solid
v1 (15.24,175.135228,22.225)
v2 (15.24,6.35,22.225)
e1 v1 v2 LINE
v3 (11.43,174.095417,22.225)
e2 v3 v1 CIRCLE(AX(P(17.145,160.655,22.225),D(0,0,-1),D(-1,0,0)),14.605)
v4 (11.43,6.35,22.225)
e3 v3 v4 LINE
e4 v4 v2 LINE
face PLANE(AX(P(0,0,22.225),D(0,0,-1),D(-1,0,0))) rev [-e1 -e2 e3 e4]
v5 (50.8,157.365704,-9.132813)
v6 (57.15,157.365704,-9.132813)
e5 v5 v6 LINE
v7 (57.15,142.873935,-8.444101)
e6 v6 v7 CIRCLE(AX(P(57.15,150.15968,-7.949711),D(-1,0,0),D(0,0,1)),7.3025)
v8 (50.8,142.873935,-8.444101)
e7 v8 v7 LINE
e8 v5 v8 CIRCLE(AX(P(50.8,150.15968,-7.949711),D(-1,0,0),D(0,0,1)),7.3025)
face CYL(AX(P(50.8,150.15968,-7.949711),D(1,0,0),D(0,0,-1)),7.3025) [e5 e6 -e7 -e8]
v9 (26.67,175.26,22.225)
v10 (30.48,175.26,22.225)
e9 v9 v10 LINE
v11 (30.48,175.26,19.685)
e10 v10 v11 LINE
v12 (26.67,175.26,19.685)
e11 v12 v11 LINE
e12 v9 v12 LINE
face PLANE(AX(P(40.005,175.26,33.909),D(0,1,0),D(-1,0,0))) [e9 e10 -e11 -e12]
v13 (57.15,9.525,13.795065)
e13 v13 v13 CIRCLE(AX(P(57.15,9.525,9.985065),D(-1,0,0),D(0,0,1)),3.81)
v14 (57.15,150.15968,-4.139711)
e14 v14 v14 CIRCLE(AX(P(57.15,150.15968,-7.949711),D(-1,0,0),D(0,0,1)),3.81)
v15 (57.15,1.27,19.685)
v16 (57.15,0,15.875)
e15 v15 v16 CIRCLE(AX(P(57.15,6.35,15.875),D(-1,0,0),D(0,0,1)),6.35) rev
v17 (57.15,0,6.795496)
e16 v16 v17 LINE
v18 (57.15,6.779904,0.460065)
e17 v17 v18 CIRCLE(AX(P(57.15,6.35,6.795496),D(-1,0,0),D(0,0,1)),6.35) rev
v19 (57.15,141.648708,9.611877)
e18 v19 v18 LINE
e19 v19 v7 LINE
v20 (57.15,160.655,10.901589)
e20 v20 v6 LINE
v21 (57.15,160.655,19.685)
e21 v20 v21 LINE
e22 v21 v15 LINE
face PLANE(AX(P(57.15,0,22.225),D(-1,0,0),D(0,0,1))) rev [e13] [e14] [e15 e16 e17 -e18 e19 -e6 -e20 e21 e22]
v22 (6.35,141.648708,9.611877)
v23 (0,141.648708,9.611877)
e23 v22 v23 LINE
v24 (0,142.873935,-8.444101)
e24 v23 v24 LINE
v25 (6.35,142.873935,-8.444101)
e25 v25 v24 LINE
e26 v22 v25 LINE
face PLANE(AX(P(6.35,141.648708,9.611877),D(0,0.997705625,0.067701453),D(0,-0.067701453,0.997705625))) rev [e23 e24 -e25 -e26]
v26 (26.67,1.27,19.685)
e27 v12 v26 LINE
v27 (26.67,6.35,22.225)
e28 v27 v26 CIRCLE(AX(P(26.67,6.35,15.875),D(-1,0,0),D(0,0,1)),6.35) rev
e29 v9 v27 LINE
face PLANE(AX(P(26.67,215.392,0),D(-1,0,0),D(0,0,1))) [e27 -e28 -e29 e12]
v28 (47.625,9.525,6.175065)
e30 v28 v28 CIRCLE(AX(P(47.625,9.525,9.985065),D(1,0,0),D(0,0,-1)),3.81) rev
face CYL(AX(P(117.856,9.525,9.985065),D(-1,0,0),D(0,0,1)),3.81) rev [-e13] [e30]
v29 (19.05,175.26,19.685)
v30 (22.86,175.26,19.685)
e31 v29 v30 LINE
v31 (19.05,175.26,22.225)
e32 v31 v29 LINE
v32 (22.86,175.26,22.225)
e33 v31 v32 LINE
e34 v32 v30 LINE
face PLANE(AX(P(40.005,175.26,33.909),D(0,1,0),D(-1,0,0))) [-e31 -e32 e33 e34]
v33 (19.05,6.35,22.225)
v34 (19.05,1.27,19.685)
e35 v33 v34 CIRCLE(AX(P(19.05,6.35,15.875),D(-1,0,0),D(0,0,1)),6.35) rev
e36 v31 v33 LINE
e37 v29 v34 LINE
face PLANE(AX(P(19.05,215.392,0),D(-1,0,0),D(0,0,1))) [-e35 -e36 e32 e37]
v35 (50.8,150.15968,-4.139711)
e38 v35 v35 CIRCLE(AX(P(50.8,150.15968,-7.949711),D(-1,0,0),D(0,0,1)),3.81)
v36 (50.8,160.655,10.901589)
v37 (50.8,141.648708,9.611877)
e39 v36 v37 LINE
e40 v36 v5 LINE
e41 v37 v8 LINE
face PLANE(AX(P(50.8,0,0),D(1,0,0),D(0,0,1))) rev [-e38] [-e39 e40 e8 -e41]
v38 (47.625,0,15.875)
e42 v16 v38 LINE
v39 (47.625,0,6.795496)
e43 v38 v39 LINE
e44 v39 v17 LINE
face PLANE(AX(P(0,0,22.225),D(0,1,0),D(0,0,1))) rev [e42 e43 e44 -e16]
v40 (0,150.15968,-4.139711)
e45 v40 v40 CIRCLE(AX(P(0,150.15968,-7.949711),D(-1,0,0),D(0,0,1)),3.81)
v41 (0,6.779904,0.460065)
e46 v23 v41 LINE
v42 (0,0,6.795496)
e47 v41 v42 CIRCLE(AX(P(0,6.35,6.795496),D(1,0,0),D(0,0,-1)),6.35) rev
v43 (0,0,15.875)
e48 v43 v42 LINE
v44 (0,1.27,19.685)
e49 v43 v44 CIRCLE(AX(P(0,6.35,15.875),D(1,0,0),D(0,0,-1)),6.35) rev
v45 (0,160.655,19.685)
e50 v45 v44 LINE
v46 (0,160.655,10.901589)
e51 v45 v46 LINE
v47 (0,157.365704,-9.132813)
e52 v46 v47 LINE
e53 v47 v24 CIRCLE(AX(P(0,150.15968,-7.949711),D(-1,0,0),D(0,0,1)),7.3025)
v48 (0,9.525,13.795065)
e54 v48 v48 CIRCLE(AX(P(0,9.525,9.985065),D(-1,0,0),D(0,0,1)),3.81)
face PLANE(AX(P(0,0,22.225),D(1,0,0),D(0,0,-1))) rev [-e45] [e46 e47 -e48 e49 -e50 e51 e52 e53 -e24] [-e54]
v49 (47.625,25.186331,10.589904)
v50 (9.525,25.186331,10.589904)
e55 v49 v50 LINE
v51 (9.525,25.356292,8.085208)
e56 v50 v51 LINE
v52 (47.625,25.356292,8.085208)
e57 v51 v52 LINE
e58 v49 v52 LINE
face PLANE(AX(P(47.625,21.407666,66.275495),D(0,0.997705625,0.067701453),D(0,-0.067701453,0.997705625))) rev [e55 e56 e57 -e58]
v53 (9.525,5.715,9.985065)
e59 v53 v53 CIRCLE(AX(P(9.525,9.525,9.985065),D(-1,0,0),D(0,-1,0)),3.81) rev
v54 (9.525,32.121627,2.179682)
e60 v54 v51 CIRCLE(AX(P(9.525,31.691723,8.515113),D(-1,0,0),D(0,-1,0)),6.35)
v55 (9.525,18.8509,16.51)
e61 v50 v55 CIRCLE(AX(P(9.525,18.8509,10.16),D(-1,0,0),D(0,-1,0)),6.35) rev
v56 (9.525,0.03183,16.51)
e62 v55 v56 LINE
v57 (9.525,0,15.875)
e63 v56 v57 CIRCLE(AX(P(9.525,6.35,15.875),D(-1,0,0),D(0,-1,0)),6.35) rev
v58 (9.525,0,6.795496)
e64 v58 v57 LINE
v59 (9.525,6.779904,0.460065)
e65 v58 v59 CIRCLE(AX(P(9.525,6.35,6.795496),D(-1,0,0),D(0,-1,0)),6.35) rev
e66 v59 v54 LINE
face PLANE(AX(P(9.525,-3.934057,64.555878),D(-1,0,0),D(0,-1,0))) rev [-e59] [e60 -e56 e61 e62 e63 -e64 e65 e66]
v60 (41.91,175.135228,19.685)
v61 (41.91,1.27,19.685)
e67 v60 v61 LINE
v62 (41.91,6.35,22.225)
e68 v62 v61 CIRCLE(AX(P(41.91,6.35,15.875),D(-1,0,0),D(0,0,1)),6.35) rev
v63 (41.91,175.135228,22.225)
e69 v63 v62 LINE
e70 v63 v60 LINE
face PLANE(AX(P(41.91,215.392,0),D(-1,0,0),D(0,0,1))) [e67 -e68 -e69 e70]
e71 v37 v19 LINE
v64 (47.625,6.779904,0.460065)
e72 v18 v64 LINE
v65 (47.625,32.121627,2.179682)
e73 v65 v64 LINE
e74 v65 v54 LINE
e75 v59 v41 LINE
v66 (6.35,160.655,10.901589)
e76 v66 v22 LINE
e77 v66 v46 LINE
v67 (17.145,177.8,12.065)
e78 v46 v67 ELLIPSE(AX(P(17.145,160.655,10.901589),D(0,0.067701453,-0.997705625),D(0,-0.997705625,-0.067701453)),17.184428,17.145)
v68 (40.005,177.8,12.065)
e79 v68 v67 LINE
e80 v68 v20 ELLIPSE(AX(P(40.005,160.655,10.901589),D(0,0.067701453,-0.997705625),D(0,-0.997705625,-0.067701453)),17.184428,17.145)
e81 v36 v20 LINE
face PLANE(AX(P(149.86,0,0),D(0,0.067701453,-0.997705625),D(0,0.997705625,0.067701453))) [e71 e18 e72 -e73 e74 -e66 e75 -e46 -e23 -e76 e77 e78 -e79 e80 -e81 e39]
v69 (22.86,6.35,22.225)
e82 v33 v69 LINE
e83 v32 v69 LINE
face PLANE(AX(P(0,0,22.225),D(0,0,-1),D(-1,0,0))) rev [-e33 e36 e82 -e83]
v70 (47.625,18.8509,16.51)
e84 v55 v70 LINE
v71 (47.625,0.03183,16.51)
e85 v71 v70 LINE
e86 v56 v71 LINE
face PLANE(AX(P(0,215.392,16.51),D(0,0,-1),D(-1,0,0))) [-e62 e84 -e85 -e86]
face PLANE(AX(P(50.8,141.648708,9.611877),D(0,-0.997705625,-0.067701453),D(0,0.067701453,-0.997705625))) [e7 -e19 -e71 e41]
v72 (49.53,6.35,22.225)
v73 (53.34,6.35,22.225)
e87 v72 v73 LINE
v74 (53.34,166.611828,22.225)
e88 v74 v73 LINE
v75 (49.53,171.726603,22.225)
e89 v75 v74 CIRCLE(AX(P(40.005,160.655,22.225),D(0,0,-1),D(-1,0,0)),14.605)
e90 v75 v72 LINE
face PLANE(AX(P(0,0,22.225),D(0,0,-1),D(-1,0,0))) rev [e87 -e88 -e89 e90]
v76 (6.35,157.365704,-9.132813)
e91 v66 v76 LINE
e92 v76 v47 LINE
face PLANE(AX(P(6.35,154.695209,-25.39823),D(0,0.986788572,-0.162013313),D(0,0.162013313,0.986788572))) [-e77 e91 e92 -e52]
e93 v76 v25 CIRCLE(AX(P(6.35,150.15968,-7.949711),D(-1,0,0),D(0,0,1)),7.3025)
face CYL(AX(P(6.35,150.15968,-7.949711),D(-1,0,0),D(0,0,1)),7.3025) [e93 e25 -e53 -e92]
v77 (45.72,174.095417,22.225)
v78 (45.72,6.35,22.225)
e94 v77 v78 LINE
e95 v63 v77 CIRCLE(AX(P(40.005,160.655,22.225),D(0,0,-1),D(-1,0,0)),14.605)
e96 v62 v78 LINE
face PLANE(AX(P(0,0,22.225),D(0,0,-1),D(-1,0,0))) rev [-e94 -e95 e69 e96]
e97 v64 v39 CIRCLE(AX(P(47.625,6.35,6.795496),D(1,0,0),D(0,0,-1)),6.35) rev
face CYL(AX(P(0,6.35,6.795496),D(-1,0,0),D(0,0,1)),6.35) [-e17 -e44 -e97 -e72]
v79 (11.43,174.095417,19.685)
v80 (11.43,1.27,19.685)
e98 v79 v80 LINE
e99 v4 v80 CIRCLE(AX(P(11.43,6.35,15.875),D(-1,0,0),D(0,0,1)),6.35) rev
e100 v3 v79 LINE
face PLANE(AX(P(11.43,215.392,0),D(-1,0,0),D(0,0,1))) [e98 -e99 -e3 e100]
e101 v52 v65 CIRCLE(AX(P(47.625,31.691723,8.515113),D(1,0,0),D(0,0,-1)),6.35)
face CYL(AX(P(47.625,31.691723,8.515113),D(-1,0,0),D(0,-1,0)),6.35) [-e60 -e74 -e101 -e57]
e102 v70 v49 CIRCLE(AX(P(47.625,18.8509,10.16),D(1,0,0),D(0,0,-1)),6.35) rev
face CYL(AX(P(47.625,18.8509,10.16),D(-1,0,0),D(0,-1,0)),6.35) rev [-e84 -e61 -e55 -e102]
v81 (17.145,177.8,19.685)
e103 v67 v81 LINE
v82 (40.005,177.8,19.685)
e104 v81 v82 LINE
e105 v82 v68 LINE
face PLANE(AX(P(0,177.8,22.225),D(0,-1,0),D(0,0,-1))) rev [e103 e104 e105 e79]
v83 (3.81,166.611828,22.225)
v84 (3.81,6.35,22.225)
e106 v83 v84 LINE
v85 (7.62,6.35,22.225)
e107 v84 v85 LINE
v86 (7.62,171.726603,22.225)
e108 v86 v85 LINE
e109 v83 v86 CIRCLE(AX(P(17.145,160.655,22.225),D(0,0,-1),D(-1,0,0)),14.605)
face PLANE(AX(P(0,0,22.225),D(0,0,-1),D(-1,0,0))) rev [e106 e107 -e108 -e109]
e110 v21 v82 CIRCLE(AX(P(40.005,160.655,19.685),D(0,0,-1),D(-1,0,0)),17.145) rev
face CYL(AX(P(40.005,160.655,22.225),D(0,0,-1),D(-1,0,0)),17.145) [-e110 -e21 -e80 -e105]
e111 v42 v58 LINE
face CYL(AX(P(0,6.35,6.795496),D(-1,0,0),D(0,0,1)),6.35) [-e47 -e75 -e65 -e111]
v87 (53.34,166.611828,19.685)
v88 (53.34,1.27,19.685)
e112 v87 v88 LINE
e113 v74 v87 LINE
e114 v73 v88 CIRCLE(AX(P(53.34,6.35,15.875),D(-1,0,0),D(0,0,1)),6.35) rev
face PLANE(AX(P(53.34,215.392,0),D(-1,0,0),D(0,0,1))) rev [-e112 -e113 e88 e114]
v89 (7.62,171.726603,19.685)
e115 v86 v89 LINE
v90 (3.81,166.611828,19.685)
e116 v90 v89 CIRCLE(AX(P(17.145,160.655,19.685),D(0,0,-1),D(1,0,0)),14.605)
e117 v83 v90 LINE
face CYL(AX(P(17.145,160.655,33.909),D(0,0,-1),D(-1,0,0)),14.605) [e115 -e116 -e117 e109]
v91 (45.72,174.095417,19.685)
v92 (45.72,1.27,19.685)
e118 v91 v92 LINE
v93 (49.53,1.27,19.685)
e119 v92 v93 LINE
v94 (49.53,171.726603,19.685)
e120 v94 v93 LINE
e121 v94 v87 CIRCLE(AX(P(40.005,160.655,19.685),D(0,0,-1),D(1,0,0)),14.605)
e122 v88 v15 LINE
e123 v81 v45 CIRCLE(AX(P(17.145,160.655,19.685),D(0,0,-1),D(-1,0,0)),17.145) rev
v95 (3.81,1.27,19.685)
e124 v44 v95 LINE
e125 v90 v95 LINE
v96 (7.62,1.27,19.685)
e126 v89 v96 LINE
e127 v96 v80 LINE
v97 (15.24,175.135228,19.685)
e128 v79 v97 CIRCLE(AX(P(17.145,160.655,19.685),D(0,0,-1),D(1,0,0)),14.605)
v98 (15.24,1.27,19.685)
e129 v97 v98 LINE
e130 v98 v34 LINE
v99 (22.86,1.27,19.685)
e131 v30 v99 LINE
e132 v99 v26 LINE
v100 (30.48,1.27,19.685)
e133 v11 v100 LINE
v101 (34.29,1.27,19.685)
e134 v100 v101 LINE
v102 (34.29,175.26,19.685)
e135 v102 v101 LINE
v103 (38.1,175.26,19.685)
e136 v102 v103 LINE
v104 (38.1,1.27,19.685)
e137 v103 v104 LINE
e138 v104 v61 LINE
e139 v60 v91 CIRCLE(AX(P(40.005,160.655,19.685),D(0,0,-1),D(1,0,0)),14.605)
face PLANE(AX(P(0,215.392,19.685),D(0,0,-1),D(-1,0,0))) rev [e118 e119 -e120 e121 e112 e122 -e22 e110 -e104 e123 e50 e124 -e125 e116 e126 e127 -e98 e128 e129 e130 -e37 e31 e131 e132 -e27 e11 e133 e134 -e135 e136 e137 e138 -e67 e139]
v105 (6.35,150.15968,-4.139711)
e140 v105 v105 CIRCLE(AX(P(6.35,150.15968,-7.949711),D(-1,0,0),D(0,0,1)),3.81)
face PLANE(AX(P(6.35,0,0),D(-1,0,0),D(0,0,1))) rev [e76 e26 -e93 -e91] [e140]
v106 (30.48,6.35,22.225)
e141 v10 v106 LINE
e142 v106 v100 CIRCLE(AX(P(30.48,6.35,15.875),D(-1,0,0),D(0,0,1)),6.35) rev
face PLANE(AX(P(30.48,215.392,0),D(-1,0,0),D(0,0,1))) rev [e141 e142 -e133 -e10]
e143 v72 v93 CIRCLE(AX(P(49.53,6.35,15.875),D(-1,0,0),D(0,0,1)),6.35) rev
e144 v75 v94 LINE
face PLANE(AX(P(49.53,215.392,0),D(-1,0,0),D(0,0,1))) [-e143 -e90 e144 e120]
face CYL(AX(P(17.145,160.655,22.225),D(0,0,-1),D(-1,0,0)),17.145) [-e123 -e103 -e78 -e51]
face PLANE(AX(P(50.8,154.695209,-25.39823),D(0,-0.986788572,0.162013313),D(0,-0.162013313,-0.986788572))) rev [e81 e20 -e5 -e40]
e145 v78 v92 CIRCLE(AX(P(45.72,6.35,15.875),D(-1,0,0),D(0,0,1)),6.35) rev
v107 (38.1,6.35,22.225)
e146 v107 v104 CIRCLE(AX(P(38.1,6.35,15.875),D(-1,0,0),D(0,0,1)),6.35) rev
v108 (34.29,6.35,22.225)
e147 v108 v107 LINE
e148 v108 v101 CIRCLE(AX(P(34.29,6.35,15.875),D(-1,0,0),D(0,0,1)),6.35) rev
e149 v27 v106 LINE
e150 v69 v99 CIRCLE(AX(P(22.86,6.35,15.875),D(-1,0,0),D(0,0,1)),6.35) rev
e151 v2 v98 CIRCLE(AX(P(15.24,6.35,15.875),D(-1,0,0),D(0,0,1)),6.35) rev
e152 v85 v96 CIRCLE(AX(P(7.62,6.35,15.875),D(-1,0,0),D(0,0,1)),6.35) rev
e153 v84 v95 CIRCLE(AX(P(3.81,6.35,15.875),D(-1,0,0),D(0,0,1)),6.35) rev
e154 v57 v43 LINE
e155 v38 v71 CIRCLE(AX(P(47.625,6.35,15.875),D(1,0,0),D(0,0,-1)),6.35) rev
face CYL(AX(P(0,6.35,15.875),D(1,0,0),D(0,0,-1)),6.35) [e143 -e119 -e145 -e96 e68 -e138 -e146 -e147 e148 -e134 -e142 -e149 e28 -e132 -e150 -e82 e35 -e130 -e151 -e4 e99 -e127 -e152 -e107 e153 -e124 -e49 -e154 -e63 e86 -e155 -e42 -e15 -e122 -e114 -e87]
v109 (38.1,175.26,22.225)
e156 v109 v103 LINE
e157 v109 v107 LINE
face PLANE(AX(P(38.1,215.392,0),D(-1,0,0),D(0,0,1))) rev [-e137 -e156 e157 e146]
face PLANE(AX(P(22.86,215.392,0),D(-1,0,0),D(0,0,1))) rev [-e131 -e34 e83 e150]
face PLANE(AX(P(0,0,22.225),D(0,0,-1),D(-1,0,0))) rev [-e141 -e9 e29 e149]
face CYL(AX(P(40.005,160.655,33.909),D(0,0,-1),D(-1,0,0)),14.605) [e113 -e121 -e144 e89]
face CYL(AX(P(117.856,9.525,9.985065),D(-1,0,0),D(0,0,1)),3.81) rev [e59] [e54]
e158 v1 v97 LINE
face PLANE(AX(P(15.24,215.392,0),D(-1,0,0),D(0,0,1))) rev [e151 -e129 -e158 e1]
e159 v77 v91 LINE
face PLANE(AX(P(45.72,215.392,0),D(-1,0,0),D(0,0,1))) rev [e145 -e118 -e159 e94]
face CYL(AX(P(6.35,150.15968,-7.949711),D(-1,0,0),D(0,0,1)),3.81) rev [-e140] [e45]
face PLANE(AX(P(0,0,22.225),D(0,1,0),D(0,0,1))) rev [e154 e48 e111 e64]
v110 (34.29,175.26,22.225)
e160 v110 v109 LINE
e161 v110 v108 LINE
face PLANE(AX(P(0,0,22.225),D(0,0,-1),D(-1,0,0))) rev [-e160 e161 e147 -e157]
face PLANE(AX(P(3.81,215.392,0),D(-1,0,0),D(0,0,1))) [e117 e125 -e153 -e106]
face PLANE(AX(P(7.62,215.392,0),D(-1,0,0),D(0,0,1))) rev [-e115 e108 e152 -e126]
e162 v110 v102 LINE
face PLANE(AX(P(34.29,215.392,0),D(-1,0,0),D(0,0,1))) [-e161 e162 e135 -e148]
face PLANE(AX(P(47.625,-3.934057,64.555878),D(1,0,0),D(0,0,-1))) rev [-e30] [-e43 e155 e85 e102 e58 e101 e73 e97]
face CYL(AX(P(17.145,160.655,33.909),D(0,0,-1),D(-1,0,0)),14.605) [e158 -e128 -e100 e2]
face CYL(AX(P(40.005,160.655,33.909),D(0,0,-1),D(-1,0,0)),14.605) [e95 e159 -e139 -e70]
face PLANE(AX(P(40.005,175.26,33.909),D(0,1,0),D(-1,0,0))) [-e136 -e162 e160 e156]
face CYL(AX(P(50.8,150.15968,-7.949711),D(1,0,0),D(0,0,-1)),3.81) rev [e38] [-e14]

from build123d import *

# Parameters (mm, degrees)
SKETCH1_W              = 57.15
SKETCH1_H              = 177.8
BOSS_EXTRUDE1_DEPTH    = 22.225
CUT_EXTRUDE1_DEPTH     = 149.86
FILLET1_R              = 17.145
FILLET2_R              = 6.35
SKETCH4_W              = 3.81
SKETCH4_H              = 2.54
CUT_EXTRUDE2_DEPTH     = 215.392
CUT_EXTRUDE5_START     = 14.224
CUT_EXTRUDE5_DEPTH     = 14.224
SKETCH6_R              = 3.81
CUT_EXTRUDE6_DEPTH     = 117.856
SKETCH7_R              = 3.81
BOSS_EXTRUDE2_DEPTH    = 6.35
CUT_EXTRUDE7_START     = 9.525
CUT_EXTRUDE7_OUTLINE_R = 3.81
CUT_EXTRUDE7_DEPTH     = 38.1
FILLET3_R              = 6.35


# Read off the part's stored shape, not the designer's step: Cut-Extrude7
with BuildPart() as part:
    # Sketch1 → Boss-Extrude1 (new body)
    with BuildSketch(Plane.XY):
        with Locations((28.575, 88.9)):
            Rectangle(SKETCH1_W, SKETCH1_H)
    extrude(amount=BOSS_EXTRUDE1_DEPTH)

    # Sketch3 → Cut-Extrude1 (cut)
    with BuildSketch(Plane.ZY):
        Polygon((0, 0), (12.065, 177.8), (0, 177.8), align=None)
    extrude(amount=-CUT_EXTRUDE1_DEPTH, mode=Mode.SUBTRACT)

    # Fillet1
    fillet1_edges = [part.edges().sort_by_distance(p)[0] for p in [
        (0, 177.8, 17.145),
        (57.15, 177.8, 17.145),
    ]]
    fillet(fillet1_edges, radius=FILLET1_R)

    # Fillet2
    fillet2_edges = [part.edges().sort_by_distance(p)[0] for p in [
        (28.575, 0, 0),
        (28.575, 0, 22.225),
    ]]
    fillet(fillet2_edges, radius=FILLET2_R)

    # Sketch4 → Cut-Extrude2 (cut)
    with BuildSketch(Plane.XZ):
        with Locations((1.905, 20.955)):
            Rectangle(SKETCH4_W, SKETCH4_H)
        with Locations((9.525, 20.955)):
            Rectangle(SKETCH4_W, SKETCH4_H)
        with Locations((17.145, 20.955)):
            Rectangle(SKETCH4_W, SKETCH4_H)
        with Locations((24.765, 20.955)):
            Rectangle(SKETCH4_W, SKETCH4_H)
        with Locations((32.385, 20.955)):
            Rectangle(SKETCH4_W, SKETCH4_H)
        with Locations((40.005, 20.955)):
            Rectangle(SKETCH4_W, SKETCH4_H)
        with Locations((47.625, 20.955)):
            Rectangle(SKETCH4_W, SKETCH4_H)
        with Locations((55.245, 20.955)):
            Rectangle(SKETCH4_W, SKETCH4_H)
    extrude(amount=-CUT_EXTRUDE2_DEPTH, mode=Mode.SUBTRACT)

    # Sketch5 → Cut-Extrude5 (cut)
    with BuildSketch(Plane.XY.offset(19.685).offset(CUT_EXTRUDE5_START)):
        with BuildLine():
            Line((2.54, 160.655), (0, 160.655))
            ThreePointArc((0, 160.655), (0.980538982, 166.37), (3.81, 171.431307345))
            ThreePointArc((3.81, 171.431307345), (5.583362193, 173.315156248), (7.62, 174.910714644))
            ThreePointArc((7.62, 174.910714644), (9.46546693, 175.983920276), (11.43, 176.819461018))
            ThreePointArc((11.43, 176.819461018), (13.309998856, 177.365589195), (15.24, 177.693837989))
            ThreePointArc((15.24, 177.693837989), (16.191022095, 177.773438923), (17.145, 177.8))
            Line((17.145, 177.8), (19.05, 177.8))
            Line((19.05, 177.8), (22.86, 177.8))
            Line((22.86, 177.8), (26.67, 177.8))
            Line((26.67, 177.8), (30.48, 177.8))
            Line((30.48, 177.8), (34.29, 177.8))
            Line((34.29, 177.8), (38.1, 177.8))
            Line((38.1, 177.8), (40.005, 177.8))
            ThreePointArc((40.005, 177.8), (40.958977905, 177.773438923), (41.91, 177.693837989))
            ThreePointArc((41.91, 177.693837989), (43.840001144, 177.365589195), (45.72, 176.819461018))
            ThreePointArc((45.72, 176.819461018), (47.68453307, 175.983920276), (49.53, 174.910714644))
            ThreePointArc((49.53, 174.910714644), (51.566637807, 173.315156248), (53.34, 171.431307345))
            ThreePointArc((53.34, 171.431307345), (56.169461018, 166.37), (57.15, 160.655))
            Line((57.15, 160.655), (54.61, 160.655))
            ThreePointArc((54.61, 160.655), (53.774726052, 165.523333333), (51.364444444, 169.834817368))
            ThreePointArc((51.364444444, 169.834817368), (49.853802577, 171.439577544), (48.118888889, 172.798756919))
            ThreePointArc((48.118888889, 172.798756919), (46.546824467, 173.712969124), (44.873333333, 174.424726052))
            ThreePointArc((44.873333333, 174.424726052), (43.271852826, 174.889946351), (41.627777778, 175.169565694))
            ThreePointArc((41.627777778, 175.169565694), (40.817647845, 175.237373897), (40.005, 175.26))
            Line((40.005, 175.26), (38.1, 175.26))
            Line((38.1, 175.26), (34.29, 175.26))
            Line((34.29, 175.26), (30.48, 175.26))
            Line((30.48, 175.26), (26.67, 175.26))
            Line((26.67, 175.26), (22.86, 175.26))
            Line((22.86, 175.26), (19.05, 175.26))
            Line((19.05, 175.26), (17.145, 175.26))
            ThreePointArc((17.145, 175.26), (16.332352155, 175.237373897), (15.522222222, 175.169565694))
            ThreePointArc((15.522222222, 175.169565694), (13.878147174, 174.889946351), (12.276666667, 174.424726052))
            ThreePointArc((12.276666667, 174.424726052), (10.603175533, 173.712969124), (9.031111111, 172.798756919))
            ThreePointArc((9.031111111, 172.798756919), (7.296197423, 171.439577544), (5.785555556, 169.834817368))
            ThreePointArc((5.785555556, 169.834817368), (3.375273948, 165.523333333), (2.54, 160.655))
        make_face()
    extrude(amount=-CUT_EXTRUDE5_DEPTH, mode=Mode.SUBTRACT)

    # Sketch6 → Cut-Extrude6 (cut)
    with BuildSketch(Plane.ZY):
        with Locations((9.98506493, 9.525)):
            Circle(SKETCH6_R)
    extrude(amount=-CUT_EXTRUDE6_DEPTH, mode=Mode.SUBTRACT)

    # Sketch7 → Boss-Extrude2 (add)
    with BuildSketch(Plane.ZY):
        with BuildLine():
            Line((9.611876604, 141.648707852), (10.901589286, 160.655))
            Line((10.901589286, 160.655), (-9.13281329, 157.365703773))
            ThreePointArc((-9.13281329, 157.365703773), (-15.243978439, 149.813024962), (-8.444101503, 142.873934938))
            Line((-8.444101503, 142.873934938), (9.611876604, 141.648707852))
        make_face()
        with Locations((-7.949711075, 150.159680223)):
            Circle(SKETCH7_R, mode=Mode.SUBTRACT)
    boss_extrude2 = extrude(amount=-BOSS_EXTRUDE2_DEPTH)

    # Mirror1: Boss-Extrude2 across plane
    add(boss_extrude2.mirror(Plane.ZY.offset(-28.575)))

    # Cut-Extrude7 outline → Cut-Extrude7 (cut)
    with BuildSketch(Plane.YZ.offset(CUT_EXTRUDE7_START)):
        with BuildLine():
            Line((6.779904227, 0.46006493), (25.786196375, 1.749777611))
            Line((25.786196375, 1.749777611), (24.784609855, 16.51))
            Line((24.784609855, 16.51), (0.031829774, 16.51))
            ThreePointArc((0.031829774, 16.51), (0.007962436, 16.192898622), (0, 15.875))
            Line((0, 15.875), (0, 6.795495646))
            ThreePointArc((0, 6.795495646), (2.014529544, 2.155862479), (6.779904227, 0.46006493))
        make_face()
        with Locations((9.525, 9.98506493)):
            Circle(CUT_EXTRUDE7_OUTLINE_R, mode=Mode.SUBTRACT)
    extrude(amount=CUT_EXTRUDE7_DEPTH, mode=Mode.SUBTRACT)

    # Fillet3
    fillet3_edges = [part.edges().sort_by_distance(p)[0] for p in [
        (28.575, 25.786196375, 1.749777611),
        (28.575, 24.784609855, 16.51),
    ]]
    fillet(fillet3_edges, radius=FILLET3_R)


solid = part.part
